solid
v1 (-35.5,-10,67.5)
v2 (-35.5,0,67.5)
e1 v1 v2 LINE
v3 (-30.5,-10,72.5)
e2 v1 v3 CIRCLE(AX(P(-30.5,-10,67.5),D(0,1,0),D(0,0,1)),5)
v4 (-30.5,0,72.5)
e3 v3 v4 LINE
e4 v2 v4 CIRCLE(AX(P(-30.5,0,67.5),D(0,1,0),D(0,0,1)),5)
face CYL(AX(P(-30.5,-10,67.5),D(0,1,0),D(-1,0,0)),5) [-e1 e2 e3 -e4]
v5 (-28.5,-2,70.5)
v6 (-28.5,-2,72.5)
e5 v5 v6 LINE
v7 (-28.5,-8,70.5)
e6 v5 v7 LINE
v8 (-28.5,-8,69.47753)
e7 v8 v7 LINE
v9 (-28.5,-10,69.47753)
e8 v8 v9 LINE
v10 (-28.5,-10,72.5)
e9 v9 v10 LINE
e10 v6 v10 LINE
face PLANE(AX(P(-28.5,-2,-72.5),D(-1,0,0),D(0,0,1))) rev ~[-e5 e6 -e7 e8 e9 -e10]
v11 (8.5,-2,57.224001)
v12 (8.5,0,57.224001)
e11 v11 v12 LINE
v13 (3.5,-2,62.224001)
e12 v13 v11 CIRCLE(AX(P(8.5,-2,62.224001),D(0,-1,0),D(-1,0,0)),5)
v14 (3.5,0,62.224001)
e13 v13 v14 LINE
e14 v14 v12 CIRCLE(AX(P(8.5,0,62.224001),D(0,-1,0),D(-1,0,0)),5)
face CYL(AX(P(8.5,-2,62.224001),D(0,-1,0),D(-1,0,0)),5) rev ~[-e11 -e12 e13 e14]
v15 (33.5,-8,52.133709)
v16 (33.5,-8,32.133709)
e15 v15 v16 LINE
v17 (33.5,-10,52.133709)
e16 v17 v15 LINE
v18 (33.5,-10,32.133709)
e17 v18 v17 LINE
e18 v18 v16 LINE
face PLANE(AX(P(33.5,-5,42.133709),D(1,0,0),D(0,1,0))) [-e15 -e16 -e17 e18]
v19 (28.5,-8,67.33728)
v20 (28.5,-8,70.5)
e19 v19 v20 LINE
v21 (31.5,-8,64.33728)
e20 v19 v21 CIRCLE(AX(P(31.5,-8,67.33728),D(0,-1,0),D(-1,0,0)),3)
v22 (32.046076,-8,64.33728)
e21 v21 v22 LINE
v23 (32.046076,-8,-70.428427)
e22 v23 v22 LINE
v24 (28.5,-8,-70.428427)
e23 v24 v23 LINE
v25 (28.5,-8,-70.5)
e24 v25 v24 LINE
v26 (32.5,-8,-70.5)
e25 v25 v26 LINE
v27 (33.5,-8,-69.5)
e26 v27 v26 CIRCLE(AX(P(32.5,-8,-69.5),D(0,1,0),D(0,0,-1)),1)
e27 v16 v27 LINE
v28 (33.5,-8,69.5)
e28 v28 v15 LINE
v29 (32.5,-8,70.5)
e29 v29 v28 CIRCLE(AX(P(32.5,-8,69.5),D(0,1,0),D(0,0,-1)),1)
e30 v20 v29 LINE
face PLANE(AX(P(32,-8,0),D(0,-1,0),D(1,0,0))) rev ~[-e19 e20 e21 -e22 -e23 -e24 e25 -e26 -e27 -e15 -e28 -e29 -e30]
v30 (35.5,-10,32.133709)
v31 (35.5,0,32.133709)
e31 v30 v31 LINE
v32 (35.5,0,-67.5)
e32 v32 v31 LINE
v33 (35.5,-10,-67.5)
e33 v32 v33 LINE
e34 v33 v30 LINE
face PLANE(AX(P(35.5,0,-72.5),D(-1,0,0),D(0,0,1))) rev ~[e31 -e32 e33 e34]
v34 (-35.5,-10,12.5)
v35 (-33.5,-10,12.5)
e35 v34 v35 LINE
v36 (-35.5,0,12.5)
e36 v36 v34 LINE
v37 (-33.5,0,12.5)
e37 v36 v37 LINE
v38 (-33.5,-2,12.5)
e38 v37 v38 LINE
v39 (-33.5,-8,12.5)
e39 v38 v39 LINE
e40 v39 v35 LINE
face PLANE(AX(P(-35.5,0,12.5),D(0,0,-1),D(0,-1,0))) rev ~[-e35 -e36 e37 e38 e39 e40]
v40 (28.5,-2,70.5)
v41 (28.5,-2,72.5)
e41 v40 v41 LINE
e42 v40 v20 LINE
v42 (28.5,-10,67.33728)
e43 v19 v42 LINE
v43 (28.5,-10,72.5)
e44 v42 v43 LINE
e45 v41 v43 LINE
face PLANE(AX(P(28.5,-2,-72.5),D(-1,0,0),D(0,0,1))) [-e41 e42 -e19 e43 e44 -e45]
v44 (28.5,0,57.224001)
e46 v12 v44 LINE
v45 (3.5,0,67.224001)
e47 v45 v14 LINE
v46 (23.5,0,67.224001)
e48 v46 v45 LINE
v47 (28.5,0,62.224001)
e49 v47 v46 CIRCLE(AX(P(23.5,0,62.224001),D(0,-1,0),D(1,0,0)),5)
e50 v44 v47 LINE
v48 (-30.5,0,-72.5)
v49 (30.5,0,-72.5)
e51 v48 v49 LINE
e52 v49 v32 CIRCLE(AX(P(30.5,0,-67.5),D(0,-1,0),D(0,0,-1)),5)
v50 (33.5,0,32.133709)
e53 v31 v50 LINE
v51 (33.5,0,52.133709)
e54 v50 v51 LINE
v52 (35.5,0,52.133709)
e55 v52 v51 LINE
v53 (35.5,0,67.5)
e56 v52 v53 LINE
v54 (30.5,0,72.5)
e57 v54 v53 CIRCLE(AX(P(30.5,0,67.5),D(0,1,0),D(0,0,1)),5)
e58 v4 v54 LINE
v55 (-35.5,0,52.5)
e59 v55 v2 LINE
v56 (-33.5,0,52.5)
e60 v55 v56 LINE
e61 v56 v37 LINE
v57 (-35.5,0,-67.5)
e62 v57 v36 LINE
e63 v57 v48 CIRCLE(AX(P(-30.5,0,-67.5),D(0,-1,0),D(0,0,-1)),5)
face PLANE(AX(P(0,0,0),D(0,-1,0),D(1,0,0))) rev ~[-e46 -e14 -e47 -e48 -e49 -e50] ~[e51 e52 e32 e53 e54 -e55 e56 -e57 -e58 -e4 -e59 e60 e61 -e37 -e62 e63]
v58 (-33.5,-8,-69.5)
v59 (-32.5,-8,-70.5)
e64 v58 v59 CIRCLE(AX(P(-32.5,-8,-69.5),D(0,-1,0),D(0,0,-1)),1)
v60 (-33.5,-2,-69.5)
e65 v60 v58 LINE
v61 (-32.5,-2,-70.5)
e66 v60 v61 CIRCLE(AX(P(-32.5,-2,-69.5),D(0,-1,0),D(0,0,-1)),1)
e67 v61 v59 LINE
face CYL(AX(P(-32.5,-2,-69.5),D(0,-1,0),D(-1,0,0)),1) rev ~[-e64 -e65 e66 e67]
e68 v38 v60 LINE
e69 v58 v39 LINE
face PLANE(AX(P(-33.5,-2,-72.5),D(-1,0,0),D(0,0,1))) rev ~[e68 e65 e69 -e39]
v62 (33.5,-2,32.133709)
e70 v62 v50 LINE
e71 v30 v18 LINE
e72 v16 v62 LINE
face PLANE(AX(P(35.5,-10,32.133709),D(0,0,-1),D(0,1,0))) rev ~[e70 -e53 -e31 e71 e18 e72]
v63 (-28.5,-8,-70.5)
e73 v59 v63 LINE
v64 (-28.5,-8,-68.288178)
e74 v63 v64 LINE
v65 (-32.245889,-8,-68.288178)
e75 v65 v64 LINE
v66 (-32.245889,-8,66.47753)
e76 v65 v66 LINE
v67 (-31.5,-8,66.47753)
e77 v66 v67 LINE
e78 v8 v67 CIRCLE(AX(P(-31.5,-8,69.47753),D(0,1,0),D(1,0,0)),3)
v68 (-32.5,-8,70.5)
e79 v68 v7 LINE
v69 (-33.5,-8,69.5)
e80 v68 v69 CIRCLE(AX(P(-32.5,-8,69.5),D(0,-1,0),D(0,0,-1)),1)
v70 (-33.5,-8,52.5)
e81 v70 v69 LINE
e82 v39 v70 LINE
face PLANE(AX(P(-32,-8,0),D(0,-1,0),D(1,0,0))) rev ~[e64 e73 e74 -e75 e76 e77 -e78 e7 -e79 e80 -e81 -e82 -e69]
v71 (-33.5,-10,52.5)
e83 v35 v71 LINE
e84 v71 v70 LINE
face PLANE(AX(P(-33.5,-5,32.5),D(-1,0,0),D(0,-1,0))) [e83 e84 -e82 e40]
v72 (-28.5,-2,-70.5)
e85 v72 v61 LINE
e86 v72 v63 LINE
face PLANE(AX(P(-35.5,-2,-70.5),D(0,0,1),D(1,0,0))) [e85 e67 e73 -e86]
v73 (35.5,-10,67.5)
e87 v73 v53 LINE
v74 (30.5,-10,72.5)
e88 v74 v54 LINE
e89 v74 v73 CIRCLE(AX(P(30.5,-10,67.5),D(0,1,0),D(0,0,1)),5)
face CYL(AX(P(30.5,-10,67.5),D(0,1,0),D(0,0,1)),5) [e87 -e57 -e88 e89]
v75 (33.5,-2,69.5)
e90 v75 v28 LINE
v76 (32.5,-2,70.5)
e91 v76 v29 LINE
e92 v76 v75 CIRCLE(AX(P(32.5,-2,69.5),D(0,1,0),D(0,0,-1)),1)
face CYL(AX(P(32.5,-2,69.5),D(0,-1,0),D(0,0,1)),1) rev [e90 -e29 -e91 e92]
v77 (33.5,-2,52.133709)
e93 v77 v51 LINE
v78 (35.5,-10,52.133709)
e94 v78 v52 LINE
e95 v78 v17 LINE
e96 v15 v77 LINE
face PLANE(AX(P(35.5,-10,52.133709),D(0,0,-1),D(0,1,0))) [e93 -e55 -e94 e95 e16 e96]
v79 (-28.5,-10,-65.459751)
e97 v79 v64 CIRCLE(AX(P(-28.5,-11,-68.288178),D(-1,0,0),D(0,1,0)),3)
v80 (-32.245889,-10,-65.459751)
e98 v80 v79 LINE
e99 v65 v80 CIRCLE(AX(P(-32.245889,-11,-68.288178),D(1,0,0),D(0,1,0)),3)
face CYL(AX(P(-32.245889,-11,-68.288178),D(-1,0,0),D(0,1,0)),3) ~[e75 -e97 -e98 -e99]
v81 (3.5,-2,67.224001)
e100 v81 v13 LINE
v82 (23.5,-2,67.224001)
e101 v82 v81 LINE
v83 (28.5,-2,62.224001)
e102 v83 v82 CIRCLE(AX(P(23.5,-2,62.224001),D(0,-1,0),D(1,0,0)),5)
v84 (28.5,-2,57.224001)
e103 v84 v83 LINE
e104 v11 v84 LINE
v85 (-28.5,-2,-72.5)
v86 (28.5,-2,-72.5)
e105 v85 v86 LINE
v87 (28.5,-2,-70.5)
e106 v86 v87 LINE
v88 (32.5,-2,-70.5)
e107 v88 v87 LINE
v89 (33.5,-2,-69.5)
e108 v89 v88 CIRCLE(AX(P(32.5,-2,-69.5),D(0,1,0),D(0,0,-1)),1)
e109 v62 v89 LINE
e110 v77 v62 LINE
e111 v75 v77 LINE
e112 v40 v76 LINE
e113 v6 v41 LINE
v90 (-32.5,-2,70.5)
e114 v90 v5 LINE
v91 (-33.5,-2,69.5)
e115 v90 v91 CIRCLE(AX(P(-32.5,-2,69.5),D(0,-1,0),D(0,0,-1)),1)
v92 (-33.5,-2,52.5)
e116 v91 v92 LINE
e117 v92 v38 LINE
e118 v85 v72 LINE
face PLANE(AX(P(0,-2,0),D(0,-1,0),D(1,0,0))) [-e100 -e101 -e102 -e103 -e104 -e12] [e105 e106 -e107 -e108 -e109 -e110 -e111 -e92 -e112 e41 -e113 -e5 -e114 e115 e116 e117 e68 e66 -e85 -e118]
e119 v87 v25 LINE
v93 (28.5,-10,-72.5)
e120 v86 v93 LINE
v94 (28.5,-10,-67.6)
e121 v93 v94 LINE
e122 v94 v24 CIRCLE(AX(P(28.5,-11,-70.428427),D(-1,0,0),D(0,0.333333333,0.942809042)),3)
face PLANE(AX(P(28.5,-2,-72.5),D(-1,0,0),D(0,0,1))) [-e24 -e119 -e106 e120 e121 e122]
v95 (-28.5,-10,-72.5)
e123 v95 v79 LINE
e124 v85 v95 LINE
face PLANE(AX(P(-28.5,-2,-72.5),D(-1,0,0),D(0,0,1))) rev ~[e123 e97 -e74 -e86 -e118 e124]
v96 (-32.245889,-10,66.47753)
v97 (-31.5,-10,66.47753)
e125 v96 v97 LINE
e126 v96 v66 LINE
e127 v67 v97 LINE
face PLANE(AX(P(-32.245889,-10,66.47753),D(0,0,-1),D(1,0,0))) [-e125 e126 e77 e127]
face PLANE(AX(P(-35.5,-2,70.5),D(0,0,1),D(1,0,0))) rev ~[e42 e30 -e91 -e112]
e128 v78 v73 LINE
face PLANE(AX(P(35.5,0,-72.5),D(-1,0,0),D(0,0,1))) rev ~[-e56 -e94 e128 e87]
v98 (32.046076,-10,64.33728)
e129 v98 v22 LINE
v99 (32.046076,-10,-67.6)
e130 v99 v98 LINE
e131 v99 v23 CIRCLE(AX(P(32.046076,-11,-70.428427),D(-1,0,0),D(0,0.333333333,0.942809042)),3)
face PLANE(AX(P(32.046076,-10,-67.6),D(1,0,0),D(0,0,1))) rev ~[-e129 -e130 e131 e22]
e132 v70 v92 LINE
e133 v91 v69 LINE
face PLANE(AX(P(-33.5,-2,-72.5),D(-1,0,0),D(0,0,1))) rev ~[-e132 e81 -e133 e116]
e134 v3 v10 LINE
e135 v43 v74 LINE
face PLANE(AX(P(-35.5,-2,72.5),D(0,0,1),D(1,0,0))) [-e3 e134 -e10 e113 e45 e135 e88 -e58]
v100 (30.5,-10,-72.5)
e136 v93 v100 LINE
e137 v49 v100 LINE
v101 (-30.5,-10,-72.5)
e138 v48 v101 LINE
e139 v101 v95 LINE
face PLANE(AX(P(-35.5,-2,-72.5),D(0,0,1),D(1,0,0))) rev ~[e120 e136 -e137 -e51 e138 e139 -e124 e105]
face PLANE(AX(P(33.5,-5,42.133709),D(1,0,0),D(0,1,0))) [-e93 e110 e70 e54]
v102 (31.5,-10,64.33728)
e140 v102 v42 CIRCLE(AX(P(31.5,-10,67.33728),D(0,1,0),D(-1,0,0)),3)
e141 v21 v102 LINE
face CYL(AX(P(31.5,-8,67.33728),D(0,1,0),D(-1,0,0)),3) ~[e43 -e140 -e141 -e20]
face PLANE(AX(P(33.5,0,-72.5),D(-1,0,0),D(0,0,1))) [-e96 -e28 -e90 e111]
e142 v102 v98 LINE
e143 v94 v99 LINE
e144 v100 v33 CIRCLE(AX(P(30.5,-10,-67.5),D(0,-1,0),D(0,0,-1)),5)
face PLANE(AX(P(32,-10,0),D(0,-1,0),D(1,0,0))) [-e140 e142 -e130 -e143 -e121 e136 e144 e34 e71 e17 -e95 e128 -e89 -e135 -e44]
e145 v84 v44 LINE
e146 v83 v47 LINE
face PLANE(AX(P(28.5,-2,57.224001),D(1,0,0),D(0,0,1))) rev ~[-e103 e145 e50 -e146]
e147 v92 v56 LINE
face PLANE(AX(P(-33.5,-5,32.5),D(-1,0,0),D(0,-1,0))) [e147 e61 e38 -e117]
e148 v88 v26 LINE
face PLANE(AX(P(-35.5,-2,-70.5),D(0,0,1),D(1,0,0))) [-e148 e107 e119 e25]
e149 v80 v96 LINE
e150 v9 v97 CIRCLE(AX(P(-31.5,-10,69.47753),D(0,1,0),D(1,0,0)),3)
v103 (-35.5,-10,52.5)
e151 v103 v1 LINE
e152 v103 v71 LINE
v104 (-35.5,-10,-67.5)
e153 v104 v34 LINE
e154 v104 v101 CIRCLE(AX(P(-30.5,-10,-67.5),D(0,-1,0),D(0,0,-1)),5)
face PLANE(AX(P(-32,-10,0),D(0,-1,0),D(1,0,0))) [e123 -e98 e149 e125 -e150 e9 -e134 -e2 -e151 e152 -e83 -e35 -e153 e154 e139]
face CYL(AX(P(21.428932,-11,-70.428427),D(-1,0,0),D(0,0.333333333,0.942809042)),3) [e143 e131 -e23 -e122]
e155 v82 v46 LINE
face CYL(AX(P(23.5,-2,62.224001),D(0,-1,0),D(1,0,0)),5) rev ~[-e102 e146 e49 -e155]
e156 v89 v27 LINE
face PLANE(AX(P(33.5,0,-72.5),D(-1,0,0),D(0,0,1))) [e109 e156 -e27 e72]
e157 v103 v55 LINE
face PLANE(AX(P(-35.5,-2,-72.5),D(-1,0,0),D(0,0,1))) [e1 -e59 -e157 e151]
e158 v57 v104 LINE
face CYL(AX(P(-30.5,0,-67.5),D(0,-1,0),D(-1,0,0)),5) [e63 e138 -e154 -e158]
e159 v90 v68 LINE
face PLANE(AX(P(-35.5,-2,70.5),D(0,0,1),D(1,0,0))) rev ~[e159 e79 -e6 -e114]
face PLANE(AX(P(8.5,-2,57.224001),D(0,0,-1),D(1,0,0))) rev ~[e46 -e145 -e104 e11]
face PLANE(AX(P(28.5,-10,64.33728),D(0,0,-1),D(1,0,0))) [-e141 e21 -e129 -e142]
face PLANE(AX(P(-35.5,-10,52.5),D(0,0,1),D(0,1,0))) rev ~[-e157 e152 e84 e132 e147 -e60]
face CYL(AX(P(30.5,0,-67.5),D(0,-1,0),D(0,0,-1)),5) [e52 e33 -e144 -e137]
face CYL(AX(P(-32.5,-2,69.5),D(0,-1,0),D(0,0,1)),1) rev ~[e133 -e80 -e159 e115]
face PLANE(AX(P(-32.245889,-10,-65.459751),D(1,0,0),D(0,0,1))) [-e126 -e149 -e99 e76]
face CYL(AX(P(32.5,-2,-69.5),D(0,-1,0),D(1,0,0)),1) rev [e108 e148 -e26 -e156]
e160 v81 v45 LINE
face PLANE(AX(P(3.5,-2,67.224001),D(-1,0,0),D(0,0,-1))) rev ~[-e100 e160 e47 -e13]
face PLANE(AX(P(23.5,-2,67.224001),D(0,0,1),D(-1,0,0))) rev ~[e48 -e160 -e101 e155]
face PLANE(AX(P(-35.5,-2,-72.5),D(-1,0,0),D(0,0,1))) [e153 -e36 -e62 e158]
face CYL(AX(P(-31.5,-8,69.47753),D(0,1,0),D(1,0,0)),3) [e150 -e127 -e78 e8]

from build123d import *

# Parameters (mm, degrees)
F0_W         = 71
F0_H         = 145
F1_DEPTH     = 2
F2_W         = 7
F2_H         = 145
F3_DEPTH     = 8
F4_T         = 2
F5_W         = 3.7458891392
F5_H         = 131.9372802973
F6_DEPTH     = 2
F7_W         = 3.5460759103
F7_H         = 131.9372802973
F8_DEPTH     = 2
F9_R         = 5
F11_DEPTH    = 2.5
F13_DEPTH    = 2
F15_T1_DEPTH = 9.5
F15_T3_DEPTH = 10.6171437222
F15_T5_DEPTH = 10.816956951
F16_R        = 1
F14_W        = 10
F14_H        = 20
F17_DEPTH    = 2


# Not quite as in the source:
# - a fillet or chamfer that OpenCascade refuses, or shapes differently, is made with other operations: its cross-section is extruded or revolved along the edge and cut away or added
# - a shell that OpenCascade refuses in one call is made with other operations: the cavity is built on its own and cut out
# - a feature names something its author has since deleted; it is built from what else it names


with BuildPart() as f1:
    # F0 (on Front) → F1 (new body)
    with BuildSketch(Plane.XZ):
        Rectangle(F0_W, F0_H)
    extrude(amount=F1_DEPTH)

    # F2 (on face) → F3 (join)
    with BuildSketch(Plane.XZ.offset(2)):
        with Locations((-32, 0)):
            Rectangle(F2_W, F2_H)
        with Locations((32, 0)):
            Rectangle(F2_W, F2_H)
    extrude(amount=F3_DEPTH)

    # F4: shell of thickness 2, made by hand


with BuildPart() as f4_core1:
    # F4_t2: copy of F1
    add(f1.part)

    # the walls: a layer under each face that stays
    f4_faces = [f4_core1.faces().sort_by_distance(p)[0] for p in [
        (23.6666666667, -1.6666666667, 72.5),
        (0, 0, 0),
        (-23.6666666667, -1.6666666667, -72.5),
        (-35.5, -5, 0),
        (-32, -10, 0),
        (0, -2, 0),
        (32, -10, 0),
        (35.5, -5, 0),
    ]]
    thicken(f4_faces, amount=-F4_T, mode=Mode.SUBTRACT)


with BuildPart() as f1_1:
    add(f1.part)

    # what is left inside the walls is the cavity
    f4_cavity = [f4_core1.part.solids().sort_by_distance(p)[0] for p in [
        (33.48, -6, 0),
        (-28.52, -6, 0),
    ]]
    add(f4_cavity, mode=Mode.SUBTRACT)

    # F5 (on face) → F6 (cut)
    with BuildSketch(Plane.XZ.offset(10)):
        with Locations((-30.3729445696, 0.5088895559)):
            Rectangle(F5_W, F5_H)
    extrude(amount=-F6_DEPTH, mode=Mode.SUBTRACT)

    # F7 (on face) → F8 (cut)
    with BuildSketch(Plane.XZ.offset(10)):
        with Locations((30.2730379552, -1.6313598514)):
            Rectangle(F7_W, F7_H)
    extrude(amount=-F8_DEPTH, mode=Mode.SUBTRACT)

    # F9
    f9_edges = [f1_1.edges().sort_by_distance(p)[0] for p in [
        (-35.5, -5, 72.5),
        (35.5, -5, 72.5),
        (35.5, -5, -72.5),
        (-35.5, -5, -72.5),
    ]]
    fillet(f9_edges, radius=F9_R)

    # F10 (on face) → F11 (cut)
    with BuildSketch(Plane.XZ.offset(2)):
        with BuildLine():
            ThreePointArc((28.5, 62.2240006924), (27.0355339059, 65.7595345983), (23.5, 67.2240006924))
            Line((23.5, 67.2240006924), (3.5, 67.2240006924))
            Line((3.5, 67.2240006924), (3.5, 62.2240006924))
            ThreePointArc((3.5, 62.2240006924), (4.9644660941, 58.6884667864), (8.5, 57.2240006924))
            Line((8.5, 57.2240006924), (28.5, 57.2240006924))
            Line((28.5, 57.2240006924), (28.5, 62.2240006924))
        make_face()
    extrude(amount=-F11_DEPTH, mode=Mode.SUBTRACT)

    # F12 (on face) → F13 (cut)
    with BuildSketch(Plane(origin=(-35.5, 0, 0), x_dir=(0, -1, 0), z_dir=(-1, 0, 0))):
        Polygon((10, 52.5), (0, 52.5), (0, 12.5), (10, 12.5), (10, 47.0733729486), align=None)
    extrude(amount=-F13_DEPTH, mode=Mode.SUBTRACT)

    # F15: fillet of radius 3 on 4 edges, made by hand

    # F15_s2 → F15_t1 (cut)
    with BuildSketch(Plane.XZ.offset(8)):
        with BuildLine():
            ThreePointArc((28.5, 67.3372802973), (29.3786796564, 65.2159599537), (31.5, 64.3372802973))
            Line((31.5, 64.3372802973), (28.5, 64.3372802973))
            Line((28.5, 64.3372802973), (28.5, 67.3372802973))
        make_face()
        with BuildLine():
            ThreePointArc((-28.5, 69.4775297046), (-29.3786796564, 67.356209361), (-31.5, 66.4775297046))
            Line((-31.5, 66.4775297046), (-28.5, 66.4775297046))
            Line((-28.5, 66.4775297046), (-28.5, 69.4775297046))
        make_face()
    extrude(amount=F15_T1_DEPTH, mode=Mode.SUBTRACT)

    # F15_s4 → F15_t3 (cut)
    with BuildSketch(Plane.YZ.offset(21.4289321881)):
        with BuildLine():
            ThreePointArc((-10, -67.6), (-8.5505102572, -68.6963763172), (-8, -70.4284271247))
            Line((-8, -70.4284271247), (-8, -67.6))
            Line((-8, -67.6), (-10, -67.6))
        make_face()
    extrude(amount=F15_T3_DEPTH, mode=Mode.SUBTRACT)

    # F15_s6 → F15_t5 (cut)
    with BuildSketch(Plane.YZ.offset(-32.2458891392)):
        with BuildLine():
            ThreePointArc((-8, -68.2881777175), (-8.5505102572, -66.5561269099), (-10, -65.4597505927))
            Line((-10, -65.4597505927), (-8, -65.4597505927))
            Line((-8, -65.4597505927), (-8, -68.2881777175))
        make_face()
    extrude(amount=F15_T5_DEPTH, mode=Mode.SUBTRACT)

    # F16
    f16_edges = [f1_1.edges().sort_by_distance(p)[0] for p in [
        (33.5, -5, 70.5),
        (-33.5, -5, 70.5),
        (-33.5, -5, -70.5),
        (33.5, -5, -70.5),
    ]]
    fillet(f16_edges, radius=F16_R)

    # F14 (on face) → F17 (cut)
    with BuildSketch(Plane.YZ.offset(35.5)):
        with Locations((-5, 42.1337091768)):
            Rectangle(F14_W, F14_H)
    extrude(amount=-F17_DEPTH, mode=Mode.SUBTRACT)


solid = f1_1.part
